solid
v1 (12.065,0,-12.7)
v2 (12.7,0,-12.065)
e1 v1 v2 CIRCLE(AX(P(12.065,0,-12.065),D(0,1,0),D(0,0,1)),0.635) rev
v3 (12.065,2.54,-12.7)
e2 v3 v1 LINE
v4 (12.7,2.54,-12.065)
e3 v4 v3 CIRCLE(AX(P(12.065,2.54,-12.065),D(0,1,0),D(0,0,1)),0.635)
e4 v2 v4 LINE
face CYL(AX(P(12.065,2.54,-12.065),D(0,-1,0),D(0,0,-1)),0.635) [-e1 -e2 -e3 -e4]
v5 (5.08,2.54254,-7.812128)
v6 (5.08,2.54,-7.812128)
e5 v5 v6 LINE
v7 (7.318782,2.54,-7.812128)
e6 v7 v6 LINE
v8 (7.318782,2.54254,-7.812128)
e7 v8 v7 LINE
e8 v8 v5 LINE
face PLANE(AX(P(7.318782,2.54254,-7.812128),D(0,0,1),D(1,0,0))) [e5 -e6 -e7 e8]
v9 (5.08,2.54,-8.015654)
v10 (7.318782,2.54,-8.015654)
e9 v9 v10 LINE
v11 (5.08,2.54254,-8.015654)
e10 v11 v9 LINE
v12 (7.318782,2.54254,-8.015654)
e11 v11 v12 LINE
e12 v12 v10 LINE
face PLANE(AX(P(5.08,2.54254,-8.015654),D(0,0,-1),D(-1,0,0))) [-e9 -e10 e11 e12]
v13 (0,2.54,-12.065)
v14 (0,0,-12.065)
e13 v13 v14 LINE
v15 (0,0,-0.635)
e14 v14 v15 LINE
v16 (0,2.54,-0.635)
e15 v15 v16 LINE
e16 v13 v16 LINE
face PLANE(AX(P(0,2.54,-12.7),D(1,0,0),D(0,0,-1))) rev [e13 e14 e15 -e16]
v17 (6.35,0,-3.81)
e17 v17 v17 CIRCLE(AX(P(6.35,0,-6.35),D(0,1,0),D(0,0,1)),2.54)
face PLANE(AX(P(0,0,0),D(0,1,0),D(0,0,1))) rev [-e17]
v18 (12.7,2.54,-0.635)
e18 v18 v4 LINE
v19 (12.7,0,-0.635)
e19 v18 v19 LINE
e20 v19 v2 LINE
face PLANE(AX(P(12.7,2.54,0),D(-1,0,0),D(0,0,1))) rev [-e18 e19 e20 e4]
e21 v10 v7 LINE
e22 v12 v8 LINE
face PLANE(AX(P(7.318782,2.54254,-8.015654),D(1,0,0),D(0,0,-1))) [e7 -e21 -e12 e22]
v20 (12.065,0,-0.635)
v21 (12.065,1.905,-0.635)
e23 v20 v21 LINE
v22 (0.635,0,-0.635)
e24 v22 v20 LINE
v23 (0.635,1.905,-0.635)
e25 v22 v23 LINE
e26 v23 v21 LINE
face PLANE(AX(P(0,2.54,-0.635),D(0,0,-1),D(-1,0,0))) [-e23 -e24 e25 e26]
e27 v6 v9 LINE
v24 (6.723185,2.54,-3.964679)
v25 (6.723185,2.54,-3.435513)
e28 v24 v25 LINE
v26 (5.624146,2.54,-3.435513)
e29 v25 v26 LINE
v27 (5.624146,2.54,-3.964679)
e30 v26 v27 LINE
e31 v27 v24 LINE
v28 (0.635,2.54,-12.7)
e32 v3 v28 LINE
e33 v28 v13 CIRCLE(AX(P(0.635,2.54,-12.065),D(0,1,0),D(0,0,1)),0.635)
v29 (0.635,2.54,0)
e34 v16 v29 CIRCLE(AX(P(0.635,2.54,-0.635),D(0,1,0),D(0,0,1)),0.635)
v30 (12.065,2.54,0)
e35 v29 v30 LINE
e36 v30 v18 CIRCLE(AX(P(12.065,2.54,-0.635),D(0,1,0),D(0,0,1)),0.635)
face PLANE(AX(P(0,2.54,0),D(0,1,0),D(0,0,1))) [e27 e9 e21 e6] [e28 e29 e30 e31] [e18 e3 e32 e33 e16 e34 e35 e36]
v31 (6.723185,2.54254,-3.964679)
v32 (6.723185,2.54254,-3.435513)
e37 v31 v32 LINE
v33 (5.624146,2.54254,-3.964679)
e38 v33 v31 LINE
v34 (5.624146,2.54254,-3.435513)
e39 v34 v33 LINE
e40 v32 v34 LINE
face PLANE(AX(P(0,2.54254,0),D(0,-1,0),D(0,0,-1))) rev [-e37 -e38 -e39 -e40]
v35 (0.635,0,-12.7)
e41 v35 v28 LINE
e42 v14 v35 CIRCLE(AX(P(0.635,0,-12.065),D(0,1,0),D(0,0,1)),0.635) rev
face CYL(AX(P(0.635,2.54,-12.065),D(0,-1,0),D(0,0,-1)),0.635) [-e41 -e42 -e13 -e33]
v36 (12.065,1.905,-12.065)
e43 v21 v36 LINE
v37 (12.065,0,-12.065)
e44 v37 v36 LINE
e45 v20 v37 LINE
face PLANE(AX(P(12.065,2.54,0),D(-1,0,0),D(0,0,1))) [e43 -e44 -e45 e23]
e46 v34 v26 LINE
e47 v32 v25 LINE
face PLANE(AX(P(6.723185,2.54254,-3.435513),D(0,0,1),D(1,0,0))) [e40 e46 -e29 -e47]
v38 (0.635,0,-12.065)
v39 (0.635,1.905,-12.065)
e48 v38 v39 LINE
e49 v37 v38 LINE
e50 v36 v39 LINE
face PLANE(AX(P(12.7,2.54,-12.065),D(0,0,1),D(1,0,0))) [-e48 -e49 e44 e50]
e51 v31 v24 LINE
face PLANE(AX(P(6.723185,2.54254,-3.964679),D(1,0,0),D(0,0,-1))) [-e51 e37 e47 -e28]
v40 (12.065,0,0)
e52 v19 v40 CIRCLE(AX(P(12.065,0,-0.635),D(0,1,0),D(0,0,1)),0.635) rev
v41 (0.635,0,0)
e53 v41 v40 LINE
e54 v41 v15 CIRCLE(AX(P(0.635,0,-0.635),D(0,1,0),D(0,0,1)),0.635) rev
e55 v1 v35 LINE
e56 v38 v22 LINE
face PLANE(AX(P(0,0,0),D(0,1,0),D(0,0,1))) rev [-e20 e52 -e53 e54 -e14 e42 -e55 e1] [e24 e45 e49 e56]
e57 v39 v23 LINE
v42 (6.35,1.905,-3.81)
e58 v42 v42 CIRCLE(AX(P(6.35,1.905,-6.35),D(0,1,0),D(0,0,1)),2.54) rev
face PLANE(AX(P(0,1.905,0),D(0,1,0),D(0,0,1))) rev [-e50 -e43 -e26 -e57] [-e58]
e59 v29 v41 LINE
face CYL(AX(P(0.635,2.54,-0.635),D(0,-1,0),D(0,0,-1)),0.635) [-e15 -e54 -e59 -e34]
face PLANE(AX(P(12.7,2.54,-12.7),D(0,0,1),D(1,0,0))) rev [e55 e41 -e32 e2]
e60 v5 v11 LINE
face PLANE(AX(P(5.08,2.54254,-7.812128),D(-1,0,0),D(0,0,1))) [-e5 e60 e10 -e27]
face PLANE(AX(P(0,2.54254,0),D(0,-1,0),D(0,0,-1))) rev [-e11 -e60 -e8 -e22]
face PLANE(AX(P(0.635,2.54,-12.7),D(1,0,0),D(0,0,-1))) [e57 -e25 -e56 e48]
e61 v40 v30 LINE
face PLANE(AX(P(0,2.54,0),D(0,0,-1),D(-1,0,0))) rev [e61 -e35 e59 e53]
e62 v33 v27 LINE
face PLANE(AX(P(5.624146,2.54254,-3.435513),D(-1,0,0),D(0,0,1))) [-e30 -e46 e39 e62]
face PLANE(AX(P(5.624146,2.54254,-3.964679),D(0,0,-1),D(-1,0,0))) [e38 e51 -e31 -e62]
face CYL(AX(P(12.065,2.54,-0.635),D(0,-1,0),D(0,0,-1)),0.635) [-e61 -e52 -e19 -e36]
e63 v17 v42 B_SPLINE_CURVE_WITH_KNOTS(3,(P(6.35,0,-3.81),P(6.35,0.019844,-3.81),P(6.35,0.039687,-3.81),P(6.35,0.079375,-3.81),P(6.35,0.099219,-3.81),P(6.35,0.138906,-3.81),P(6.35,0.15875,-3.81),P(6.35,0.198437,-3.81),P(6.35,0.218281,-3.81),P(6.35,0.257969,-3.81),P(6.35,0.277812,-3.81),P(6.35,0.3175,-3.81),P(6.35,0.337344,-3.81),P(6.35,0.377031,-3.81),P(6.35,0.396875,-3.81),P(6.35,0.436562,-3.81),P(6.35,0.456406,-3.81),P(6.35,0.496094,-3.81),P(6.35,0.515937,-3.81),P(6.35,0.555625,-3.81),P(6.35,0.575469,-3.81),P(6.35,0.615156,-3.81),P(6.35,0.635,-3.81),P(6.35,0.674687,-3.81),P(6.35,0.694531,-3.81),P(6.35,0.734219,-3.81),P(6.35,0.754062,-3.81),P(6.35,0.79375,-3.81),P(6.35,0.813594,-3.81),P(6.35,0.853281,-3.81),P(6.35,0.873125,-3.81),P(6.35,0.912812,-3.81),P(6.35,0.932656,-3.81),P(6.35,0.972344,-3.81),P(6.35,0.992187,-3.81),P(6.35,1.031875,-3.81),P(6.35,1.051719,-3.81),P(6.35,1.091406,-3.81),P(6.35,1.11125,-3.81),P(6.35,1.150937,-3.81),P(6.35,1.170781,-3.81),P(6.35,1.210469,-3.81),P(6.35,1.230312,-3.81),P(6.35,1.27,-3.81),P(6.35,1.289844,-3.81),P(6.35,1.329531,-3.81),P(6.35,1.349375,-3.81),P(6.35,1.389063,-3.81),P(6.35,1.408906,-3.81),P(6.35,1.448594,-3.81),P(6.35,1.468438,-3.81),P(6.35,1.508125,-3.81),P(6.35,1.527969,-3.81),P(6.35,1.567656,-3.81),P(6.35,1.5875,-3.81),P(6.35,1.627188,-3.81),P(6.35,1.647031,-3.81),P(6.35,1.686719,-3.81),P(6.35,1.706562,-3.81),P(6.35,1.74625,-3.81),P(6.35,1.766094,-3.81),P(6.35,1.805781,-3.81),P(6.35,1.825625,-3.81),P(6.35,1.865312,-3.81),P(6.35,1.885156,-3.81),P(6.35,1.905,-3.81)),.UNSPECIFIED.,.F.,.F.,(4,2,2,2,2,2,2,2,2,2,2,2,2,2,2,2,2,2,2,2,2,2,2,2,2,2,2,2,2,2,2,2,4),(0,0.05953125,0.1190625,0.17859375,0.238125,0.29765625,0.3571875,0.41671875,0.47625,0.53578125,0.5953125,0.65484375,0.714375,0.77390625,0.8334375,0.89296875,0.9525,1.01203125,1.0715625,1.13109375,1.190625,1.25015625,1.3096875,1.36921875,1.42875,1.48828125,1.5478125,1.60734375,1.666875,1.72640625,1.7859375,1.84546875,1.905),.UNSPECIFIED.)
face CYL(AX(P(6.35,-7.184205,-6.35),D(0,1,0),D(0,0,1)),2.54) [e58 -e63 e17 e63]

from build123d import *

# Parameters (mm, degrees)
SKETCH1_W           = 12.7
SKETCH1_H           = 12.7
BOSS_EXTRUDE1_DEPTH = 2.54
FILLET1_R           = 0.635
SHELL1_START        = 0.635
SHELL1_OUTLINE_W    = 1.905
SHELL1_OUTLINE_H    = 11.43
SHELL1_DEPTH        = 11.43
SKETCH2_R           = 2.54
BOSS_EXTRUDE2_DEPTH = 1.905
SKETCH4_W           = 1.099038461
SKETCH4_H           = 0.529166666
SKETCH4_W_2         = 2.238782051
SKETCH4_H_2         = 0.203525641
BOSS_EXTRUDE4_DEPTH = 0.00254


# Read off the part's stored shape, not the designer's step: Shell1
with BuildPart() as part:
    # Sketch1 → Boss-Extrude1 (new body)
    with BuildSketch(Plane(origin=(0, 0, 0), x_dir=(1, 0, 0), z_dir=(0, 1, 0))):
        with Locations((6.35, 6.35)):
            Rectangle(SKETCH1_W, SKETCH1_H)
    extrude(amount=BOSS_EXTRUDE1_DEPTH)

    # Fillet1
    fillet1_edges = [part.edges().sort_by_distance(p)[0] for p in [
        (0, 1.27, -12.7),
        (12.7, 1.27, -12.7),
        (12.7, 1.27, 0),
        (0, 1.27, 0),
    ]]
    fillet(fillet1_edges, radius=FILLET1_R)

    # Shell1 outline → Shell1 (cut)
    with BuildSketch(Plane.YZ.offset(SHELL1_START)):
        with Locations((0.9525, -6.35)):
            Rectangle(SHELL1_OUTLINE_W, SHELL1_OUTLINE_H)
    extrude(amount=SHELL1_DEPTH, mode=Mode.SUBTRACT)

    # Sketch2 → Boss-Extrude2 (add)
    with BuildSketch(Plane(origin=(0, 1.905, 0), x_dir=(-1, 0, 0), z_dir=(0, -1, 0))):
        with Locations(Location((-6.35, 6.35, 0), (0, 0, 270))):
            Circle(SKETCH2_R)
    extrude(amount=BOSS_EXTRUDE2_DEPTH)

    # Sketch4 → Boss-Extrude4 (add)
    with BuildSketch(Plane(origin=(0, 2.54, 0), x_dir=(1, 0, 0), z_dir=(0, 1, 0))):
        with Locations((6.173665384, 3.700096154)):
            Rectangle(SKETCH4_W, SKETCH4_H)
        with Locations((6.199391026, 7.913891026)):
            Rectangle(SKETCH4_W_2, SKETCH4_H_2)
    extrude(amount=BOSS_EXTRUDE4_DEPTH)


solid = part.part
